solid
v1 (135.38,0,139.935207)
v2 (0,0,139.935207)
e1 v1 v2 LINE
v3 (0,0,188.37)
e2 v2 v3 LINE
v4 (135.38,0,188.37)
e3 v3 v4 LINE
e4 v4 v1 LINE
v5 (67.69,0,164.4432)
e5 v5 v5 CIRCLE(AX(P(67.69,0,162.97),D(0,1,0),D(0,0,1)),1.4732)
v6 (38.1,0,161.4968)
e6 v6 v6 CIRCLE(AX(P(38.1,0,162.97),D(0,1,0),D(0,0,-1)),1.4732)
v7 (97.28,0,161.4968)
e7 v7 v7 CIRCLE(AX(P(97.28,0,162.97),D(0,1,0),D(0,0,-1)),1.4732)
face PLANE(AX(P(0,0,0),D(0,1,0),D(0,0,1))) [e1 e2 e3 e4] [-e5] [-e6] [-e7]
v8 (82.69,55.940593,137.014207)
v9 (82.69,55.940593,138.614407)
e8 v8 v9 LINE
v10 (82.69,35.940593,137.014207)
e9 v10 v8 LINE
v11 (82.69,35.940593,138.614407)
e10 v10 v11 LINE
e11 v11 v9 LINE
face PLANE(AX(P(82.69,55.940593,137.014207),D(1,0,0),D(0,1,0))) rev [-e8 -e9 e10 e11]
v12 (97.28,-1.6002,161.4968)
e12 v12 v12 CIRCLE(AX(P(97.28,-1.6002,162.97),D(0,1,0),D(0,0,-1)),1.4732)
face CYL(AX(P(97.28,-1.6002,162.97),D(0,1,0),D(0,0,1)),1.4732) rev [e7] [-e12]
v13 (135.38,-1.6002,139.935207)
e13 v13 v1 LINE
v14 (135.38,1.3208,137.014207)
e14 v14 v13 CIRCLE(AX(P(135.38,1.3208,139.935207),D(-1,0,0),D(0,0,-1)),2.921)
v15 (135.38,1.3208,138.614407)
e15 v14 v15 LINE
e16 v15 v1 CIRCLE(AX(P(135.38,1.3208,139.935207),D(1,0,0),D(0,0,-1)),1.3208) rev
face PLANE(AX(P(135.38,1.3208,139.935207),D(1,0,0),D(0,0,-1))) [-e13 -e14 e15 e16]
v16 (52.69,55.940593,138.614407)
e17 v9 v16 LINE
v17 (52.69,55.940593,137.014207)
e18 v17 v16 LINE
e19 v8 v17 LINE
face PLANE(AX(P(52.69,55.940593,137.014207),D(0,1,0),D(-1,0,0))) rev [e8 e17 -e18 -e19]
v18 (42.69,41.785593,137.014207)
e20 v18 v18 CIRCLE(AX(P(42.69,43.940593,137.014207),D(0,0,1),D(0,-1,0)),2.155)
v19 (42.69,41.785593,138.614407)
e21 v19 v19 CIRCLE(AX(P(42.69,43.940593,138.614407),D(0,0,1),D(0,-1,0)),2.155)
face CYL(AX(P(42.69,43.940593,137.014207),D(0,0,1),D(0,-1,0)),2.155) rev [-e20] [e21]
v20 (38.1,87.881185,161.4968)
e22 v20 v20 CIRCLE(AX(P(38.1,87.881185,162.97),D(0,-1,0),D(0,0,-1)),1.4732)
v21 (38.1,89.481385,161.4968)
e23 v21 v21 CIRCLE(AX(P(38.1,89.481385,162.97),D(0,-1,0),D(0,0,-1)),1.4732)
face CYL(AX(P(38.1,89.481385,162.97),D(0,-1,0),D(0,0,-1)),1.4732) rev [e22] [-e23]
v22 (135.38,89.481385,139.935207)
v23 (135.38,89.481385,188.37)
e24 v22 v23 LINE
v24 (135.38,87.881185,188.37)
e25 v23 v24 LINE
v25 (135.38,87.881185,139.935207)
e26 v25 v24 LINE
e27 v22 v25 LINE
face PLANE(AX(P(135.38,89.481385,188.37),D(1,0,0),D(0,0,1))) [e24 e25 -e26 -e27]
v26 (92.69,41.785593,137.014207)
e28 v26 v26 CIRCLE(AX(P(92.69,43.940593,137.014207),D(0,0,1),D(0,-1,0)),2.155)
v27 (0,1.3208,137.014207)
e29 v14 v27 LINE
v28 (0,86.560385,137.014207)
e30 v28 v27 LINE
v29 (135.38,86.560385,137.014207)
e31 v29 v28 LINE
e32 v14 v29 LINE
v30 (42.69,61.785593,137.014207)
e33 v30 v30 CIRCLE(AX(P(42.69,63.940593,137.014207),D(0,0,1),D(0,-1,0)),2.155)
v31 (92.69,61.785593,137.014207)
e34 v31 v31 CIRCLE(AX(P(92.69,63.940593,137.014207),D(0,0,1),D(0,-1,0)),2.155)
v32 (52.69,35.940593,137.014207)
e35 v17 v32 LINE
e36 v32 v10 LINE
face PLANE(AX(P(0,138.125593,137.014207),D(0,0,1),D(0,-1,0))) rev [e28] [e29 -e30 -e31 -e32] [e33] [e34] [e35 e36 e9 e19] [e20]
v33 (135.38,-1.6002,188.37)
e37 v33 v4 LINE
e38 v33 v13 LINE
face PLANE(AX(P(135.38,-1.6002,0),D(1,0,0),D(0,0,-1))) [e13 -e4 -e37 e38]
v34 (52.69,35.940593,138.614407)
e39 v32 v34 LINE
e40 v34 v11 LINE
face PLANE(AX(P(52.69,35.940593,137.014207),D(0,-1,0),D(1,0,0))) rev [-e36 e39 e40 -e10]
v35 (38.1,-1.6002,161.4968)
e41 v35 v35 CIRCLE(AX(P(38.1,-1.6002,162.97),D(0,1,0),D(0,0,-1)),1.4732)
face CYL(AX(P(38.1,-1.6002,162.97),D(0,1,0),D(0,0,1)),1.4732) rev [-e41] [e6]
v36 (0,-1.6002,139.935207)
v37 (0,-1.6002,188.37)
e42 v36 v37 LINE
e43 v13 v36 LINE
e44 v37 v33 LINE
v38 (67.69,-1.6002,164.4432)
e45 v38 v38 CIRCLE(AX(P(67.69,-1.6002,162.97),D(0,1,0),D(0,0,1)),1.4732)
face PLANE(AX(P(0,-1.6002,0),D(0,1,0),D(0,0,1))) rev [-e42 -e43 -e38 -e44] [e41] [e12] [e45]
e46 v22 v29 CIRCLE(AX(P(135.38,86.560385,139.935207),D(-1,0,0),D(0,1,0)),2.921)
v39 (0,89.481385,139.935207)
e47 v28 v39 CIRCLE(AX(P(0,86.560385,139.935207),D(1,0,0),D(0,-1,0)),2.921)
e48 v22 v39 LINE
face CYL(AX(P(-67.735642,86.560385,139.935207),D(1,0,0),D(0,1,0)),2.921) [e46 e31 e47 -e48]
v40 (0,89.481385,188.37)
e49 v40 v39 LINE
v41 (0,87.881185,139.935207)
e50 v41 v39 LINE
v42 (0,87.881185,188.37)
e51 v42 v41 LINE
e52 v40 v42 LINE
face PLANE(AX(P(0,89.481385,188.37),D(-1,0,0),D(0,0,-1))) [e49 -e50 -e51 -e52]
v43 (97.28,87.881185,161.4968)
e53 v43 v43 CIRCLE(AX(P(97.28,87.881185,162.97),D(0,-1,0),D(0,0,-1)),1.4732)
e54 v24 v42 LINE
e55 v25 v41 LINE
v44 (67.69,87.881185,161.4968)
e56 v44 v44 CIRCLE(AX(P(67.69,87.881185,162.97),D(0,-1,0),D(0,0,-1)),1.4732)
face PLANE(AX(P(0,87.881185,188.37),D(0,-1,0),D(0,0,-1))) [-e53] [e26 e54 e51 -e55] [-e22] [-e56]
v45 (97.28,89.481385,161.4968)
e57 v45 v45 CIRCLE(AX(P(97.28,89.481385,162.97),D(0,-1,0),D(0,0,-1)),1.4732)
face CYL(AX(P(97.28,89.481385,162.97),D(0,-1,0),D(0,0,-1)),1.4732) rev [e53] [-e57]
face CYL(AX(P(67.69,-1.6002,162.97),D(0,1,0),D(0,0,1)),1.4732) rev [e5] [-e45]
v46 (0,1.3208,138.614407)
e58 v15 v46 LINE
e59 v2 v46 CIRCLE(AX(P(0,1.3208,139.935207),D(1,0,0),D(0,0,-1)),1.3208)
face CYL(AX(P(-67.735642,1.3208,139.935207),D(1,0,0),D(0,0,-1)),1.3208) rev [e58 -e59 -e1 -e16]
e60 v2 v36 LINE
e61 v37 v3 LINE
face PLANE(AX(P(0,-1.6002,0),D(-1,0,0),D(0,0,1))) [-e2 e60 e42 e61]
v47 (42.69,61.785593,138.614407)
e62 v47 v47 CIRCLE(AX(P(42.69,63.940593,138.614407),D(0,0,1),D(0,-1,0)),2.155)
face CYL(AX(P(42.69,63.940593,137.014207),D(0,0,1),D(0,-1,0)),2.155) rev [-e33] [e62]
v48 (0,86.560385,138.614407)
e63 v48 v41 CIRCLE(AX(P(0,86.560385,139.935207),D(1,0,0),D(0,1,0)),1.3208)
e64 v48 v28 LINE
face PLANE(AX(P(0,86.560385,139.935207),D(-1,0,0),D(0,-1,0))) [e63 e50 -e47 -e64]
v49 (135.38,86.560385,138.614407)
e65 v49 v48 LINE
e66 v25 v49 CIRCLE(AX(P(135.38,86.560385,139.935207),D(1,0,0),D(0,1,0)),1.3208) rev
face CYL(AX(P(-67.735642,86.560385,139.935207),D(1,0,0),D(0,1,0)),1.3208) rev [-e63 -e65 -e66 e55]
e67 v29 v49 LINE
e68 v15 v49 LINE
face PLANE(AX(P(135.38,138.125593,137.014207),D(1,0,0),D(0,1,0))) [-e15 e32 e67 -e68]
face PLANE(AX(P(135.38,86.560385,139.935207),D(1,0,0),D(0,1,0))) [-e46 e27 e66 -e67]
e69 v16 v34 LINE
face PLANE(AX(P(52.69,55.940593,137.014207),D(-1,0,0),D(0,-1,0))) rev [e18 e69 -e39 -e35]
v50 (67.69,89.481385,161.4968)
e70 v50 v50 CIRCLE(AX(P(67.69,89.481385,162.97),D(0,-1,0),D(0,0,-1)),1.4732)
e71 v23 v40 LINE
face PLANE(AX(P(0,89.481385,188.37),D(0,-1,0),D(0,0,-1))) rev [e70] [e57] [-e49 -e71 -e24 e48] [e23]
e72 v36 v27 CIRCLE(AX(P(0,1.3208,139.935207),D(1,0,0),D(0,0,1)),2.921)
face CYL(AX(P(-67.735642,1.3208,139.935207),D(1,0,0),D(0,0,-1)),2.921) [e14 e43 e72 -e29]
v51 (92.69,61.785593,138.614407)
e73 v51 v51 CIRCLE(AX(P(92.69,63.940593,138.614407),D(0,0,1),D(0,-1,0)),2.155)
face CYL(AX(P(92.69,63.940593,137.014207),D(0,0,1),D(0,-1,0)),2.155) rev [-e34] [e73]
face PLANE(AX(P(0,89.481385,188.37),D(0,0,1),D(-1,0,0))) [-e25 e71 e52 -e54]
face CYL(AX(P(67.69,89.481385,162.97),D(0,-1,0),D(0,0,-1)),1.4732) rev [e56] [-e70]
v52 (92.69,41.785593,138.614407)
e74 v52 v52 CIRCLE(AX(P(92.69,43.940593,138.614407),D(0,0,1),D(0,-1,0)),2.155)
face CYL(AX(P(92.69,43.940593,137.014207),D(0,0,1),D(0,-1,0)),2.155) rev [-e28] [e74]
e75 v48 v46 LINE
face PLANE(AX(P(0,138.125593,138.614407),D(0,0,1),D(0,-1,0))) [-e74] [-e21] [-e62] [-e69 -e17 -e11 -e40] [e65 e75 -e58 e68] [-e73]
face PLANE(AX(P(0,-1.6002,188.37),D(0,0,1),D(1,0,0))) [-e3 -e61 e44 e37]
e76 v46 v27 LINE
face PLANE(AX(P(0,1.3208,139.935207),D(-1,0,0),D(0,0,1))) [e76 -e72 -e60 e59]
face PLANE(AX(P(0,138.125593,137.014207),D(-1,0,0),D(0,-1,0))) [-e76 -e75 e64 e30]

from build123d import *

# Parameters (mm, degrees)
SKETCH1_W                    = 135.38
SKETCH1_H                    = 188.37
SKETCH1_R                    = 1.4732
SKETCH1_R_2                  = 2.155
SKETCH1_W_2                  = 30
SKETCH1_H_2                  = 20
BASE_FLANGE1_DEPTH           = 1.6002
SKETCHED_BEND1_OUTLINE_W     = 135.38
SKETCHED_BEND1_OUTLINE_H     = 1.6002
SKETCHED_BEND1_DEPTH         = 137.314310973
SKETCHED_START               = 164.4432001
SKETCHED_BEND1_2_OUTLINE_W   = 135.38
SKETCHED_BEND1_2_OUTLINE_H   = 1.6002
SKETCHED_BEND1_2_DEPTH       = 23.9267999
SKETCHED_START_2             = 139.935207433
SKETCHED_BEND1_3_OUTLINE_W   = 135.38
SKETCHED_BEND1_3_OUTLINE_H   = 1.6002
SKETCHED_BEND1_3_DEPTH       = 21.561592467
SKETCHED_START_3             = 138.466703893
SKETCHED_BEND1_4_OUTLINE_W   = 135.38
SKETCHED_BEND1_4_OUTLINE_H   = 87.881185133
SKETCHED_BEND1_4_OUTLINE_R   = 2.155
SKETCHED_BEND1_4_OUTLINE_W_2 = 30
SKETCHED_BEND1_4_OUTLINE_H_2 = 20
SKETCHED_BEND1_4_DEPTH       = 0.14770354
SKETCHED_START_4             = 137.014207433
SKETCHED_BEND1_5_OUTLINE_W   = 135.38
SKETCHED_BEND1_5_OUTLINE_H   = 87.881185133
SKETCHED_BEND1_5_OUTLINE_R   = 2.155
SKETCHED_BEND1_5_OUTLINE_W_2 = 30
SKETCHED_BEND1_5_OUTLINE_H_2 = 20
SKETCHED_BEND1_5_DEPTH       = 2.921
SKETCHED_START_5             = 137.314310973
SKETCHED_BEND1_6_OUTLINE_W   = 135.38
SKETCHED_BEND1_6_OUTLINE_H   = 1.6002
SKETCHED_BEND1_6_DEPTH       = 27.128889127
SKETCHED_BEND1_7_DEPTH       = 135.38
SKETCHED_START_6             = 87
SKETCHED_BEND1_8_OUTLINE_R   = 1.4732
SKETCHED_BEND1_8_DEPTH       = 2.481385133


with BuildPart() as part:
    # Base-Flange1: sheet metal written as solids
    # Sketch1 → Base-Flange1 (new body)
    with BuildSketch(Plane(origin=(0, 0, 0), x_dir=(1, 0, 0), z_dir=(0, 1, 0))):
        with Locations((67.69, -94.185)):
            Rectangle(SKETCH1_W, SKETCH1_H)
        with Locations(Location((38.1, -25.4, 0), (0, 0, 270))):
            Circle(SKETCH1_R, mode=Mode.SUBTRACT)
        with Locations(Location((97.28, -25.4, 0), (0, 0, 270))):
            Circle(SKETCH1_R, mode=Mode.SUBTRACT)
        with Locations(Location((97.28, -162.97, 0), (0, 0, 90))):
            Circle(SKETCH1_R, mode=Mode.SUBTRACT)
        with Locations(Location((38.1, -162.97, 0), (0, 0, 90))):
            Circle(SKETCH1_R, mode=Mode.SUBTRACT)
        with Locations(Location((67.69, -25.4, 0), (0, 0, 270))):
            Circle(SKETCH1_R, mode=Mode.SUBTRACT)
        with Locations(Location((67.69, -162.97, 0), (0, 0, 270))):
            Circle(SKETCH1_R, mode=Mode.SUBTRACT)
        with Locations(Location((42.69, -94.185, 0), (0, 0, 270))):
            Circle(SKETCH1_R_2, mode=Mode.SUBTRACT)
        with Locations(Location((92.69, -94.185, 0), (0, 0, 270))):
            Circle(SKETCH1_R_2, mode=Mode.SUBTRACT)
        with Locations(Location((42.69, -74.185, 0), (0, 0, 270))):
            Circle(SKETCH1_R_2, mode=Mode.SUBTRACT)
        with Locations(Location((92.69, -74.185, 0), (0, 0, 270))):
            Circle(SKETCH1_R_2, mode=Mode.SUBTRACT)
        with Locations((67.69, -92.185)):
            Rectangle(SKETCH1_W_2, SKETCH1_H_2, mode=Mode.SUBTRACT)
    extrude(amount=-BASE_FLANGE1_DEPTH)

    # Sketched Bend1: read off the stored shape, not the designer's step
    # Sketched Bend1 outline → Sketched Bend1 (cut)
    with BuildSketch(Plane.XY):
        with Locations((67.69, -0.8001)):
            Rectangle(SKETCHED_BEND1_OUTLINE_W, SKETCHED_BEND1_OUTLINE_H)
    extrude(amount=SKETCHED_BEND1_DEPTH, mode=Mode.SUBTRACT)

    # Sketched Bend1 4 outline → Sketched Bend1 4 (add)
    with BuildSketch(Plane.XY.offset(SKETCHED_START_3)):
        with Locations((67.69, 43.940592567)):
            Rectangle(SKETCHED_BEND1_4_OUTLINE_W, SKETCHED_BEND1_4_OUTLINE_H)
        with Locations((42.69, 43.940592567)):
            Circle(SKETCHED_BEND1_4_OUTLINE_R, mode=Mode.SUBTRACT)
        with Locations((42.69, 63.940592567)):
            Circle(SKETCHED_BEND1_4_OUTLINE_R, mode=Mode.SUBTRACT)
        with Locations((67.69, 45.940592567)):
            Rectangle(SKETCHED_BEND1_4_OUTLINE_W_2, SKETCHED_BEND1_4_OUTLINE_H_2, mode=Mode.SUBTRACT)
        with Locations((92.69, 43.940592567)):
            Circle(SKETCHED_BEND1_4_OUTLINE_R, mode=Mode.SUBTRACT)
        with Locations((92.69, 63.940592567)):
            Circle(SKETCHED_BEND1_4_OUTLINE_R, mode=Mode.SUBTRACT)
    extrude(amount=SKETCHED_BEND1_4_DEPTH)



with BuildPart() as body_2:
    # Sketched Bend1 2 outline → Sketched Bend1 2 (new body)
    with BuildSketch(Plane.XY.offset(SKETCHED_START)):
        with Locations((67.69, 88.681285133)):
            Rectangle(SKETCHED_BEND1_2_OUTLINE_W, SKETCHED_BEND1_2_OUTLINE_H)
    extrude(amount=SKETCHED_BEND1_2_DEPTH)


with BuildPart() as body_3:
    # Sketched Bend1 3 outline → Sketched Bend1 3 (new body)
    with BuildSketch(Plane.XY.offset(SKETCHED_START_2)):
        with Locations((67.69, 88.681285133)):
            Rectangle(SKETCHED_BEND1_3_OUTLINE_W, SKETCHED_BEND1_3_OUTLINE_H)
    extrude(amount=SKETCHED_BEND1_3_DEPTH)


with BuildPart() as part_1:
    add(part.part)

    add(body_3.part)  # Sketched Bend1 5 merges body 3
    # Sketched Bend1 5 outline → Sketched Bend1 5 (add)
    with BuildSketch(Plane.XY.offset(SKETCHED_START_4)):
        with Locations((67.69, 43.940592567)):
            Rectangle(SKETCHED_BEND1_5_OUTLINE_W, SKETCHED_BEND1_5_OUTLINE_H)
        with Locations((42.69, 43.940592567)):
            Circle(SKETCHED_BEND1_5_OUTLINE_R, mode=Mode.SUBTRACT)
        with Locations((92.69, 43.940592567)):
            Circle(SKETCHED_BEND1_5_OUTLINE_R, mode=Mode.SUBTRACT)
        with Locations((42.69, 63.940592567)):
            Circle(SKETCHED_BEND1_5_OUTLINE_R, mode=Mode.SUBTRACT)
        with Locations((67.69, 45.940592567)):
            Rectangle(SKETCHED_BEND1_5_OUTLINE_W_2, SKETCHED_BEND1_5_OUTLINE_H_2, mode=Mode.SUBTRACT)
        with Locations((92.69, 63.940592567)):
            Circle(SKETCHED_BEND1_5_OUTLINE_R, mode=Mode.SUBTRACT)
    extrude(amount=SKETCHED_BEND1_5_DEPTH)


    add(body_2.part)  # Sketched Bend1 6 merges body 2
    # Sketched Bend1 6 outline → Sketched Bend1 6 (add)
    with BuildSketch(Plane.XY.offset(SKETCHED_START_5)):
        with Locations((67.69, 88.681285133)):
            Rectangle(SKETCHED_BEND1_6_OUTLINE_W, SKETCHED_BEND1_6_OUTLINE_H)
    extrude(amount=SKETCHED_BEND1_6_DEPTH)

    # Sketched Bend1 7 outline → Sketched Bend1 7 (cut)
    with BuildSketch(Plane.YZ):
        with BuildLine():
            ThreePointArc((89.481385133, 139.935207433), (88.62584404, 137.869748526), (86.560385133, 137.014207433))
            Line((86.560385133, 137.014207433), (87.881185133, 137.014207433))
            Line((87.881185133, 137.014207433), (87.881185133, 137.314310973))
            Line((87.881185133, 137.314310973), (89.481385133, 137.314310973))
            Line((89.481385133, 137.314310973), (89.481385133, 139.935207433))
        make_face()
        with BuildLine():
            Line((0, 137.014207433), (1.3208, 137.014207433))
            ThreePointArc((1.3208, 137.014207433), (-0.744658907, 137.869748526), (-1.6002, 139.935207433))
            Line((-1.6002, 139.935207433), (-1.6002, 137.314310973))
            Line((-1.6002, 137.314310973), (0, 137.314310973))
            Line((0, 137.314310973), (0, 137.014207433))
        make_face()
        with BuildLine():
            ThreePointArc((86.560385133, 138.614407433), (87.49433177, 139.001260796), (87.881185133, 139.935207433))
            Line((87.881185133, 139.935207433), (0, 139.935207433))
            ThreePointArc((0, 139.935207433), (0.386853363, 139.001260796), (1.3208, 138.614407433))
            Line((1.3208, 138.614407433), (86.560385133, 138.614407433))
        make_face()
    extrude(amount=SKETCHED_BEND1_7_DEPTH, mode=Mode.SUBTRACT)

    # Sketched Bend1 8 outline → Sketched Bend1 8 (cut)
    with BuildSketch(Plane(origin=(0, 0, 0), x_dir=(1, 0, 0), z_dir=(0, 1, 0)).offset(SKETCHED_START_6)):
        with Locations((67.69, -162.97)):
            Circle(SKETCHED_BEND1_8_OUTLINE_R)
        with Locations((97.28, -162.97)):
            Circle(SKETCHED_BEND1_8_OUTLINE_R)
        with Locations((38.1, -162.97)):
            Circle(SKETCHED_BEND1_8_OUTLINE_R)
    extrude(amount=SKETCHED_BEND1_8_DEPTH, mode=Mode.SUBTRACT)


solid = part_1.part
